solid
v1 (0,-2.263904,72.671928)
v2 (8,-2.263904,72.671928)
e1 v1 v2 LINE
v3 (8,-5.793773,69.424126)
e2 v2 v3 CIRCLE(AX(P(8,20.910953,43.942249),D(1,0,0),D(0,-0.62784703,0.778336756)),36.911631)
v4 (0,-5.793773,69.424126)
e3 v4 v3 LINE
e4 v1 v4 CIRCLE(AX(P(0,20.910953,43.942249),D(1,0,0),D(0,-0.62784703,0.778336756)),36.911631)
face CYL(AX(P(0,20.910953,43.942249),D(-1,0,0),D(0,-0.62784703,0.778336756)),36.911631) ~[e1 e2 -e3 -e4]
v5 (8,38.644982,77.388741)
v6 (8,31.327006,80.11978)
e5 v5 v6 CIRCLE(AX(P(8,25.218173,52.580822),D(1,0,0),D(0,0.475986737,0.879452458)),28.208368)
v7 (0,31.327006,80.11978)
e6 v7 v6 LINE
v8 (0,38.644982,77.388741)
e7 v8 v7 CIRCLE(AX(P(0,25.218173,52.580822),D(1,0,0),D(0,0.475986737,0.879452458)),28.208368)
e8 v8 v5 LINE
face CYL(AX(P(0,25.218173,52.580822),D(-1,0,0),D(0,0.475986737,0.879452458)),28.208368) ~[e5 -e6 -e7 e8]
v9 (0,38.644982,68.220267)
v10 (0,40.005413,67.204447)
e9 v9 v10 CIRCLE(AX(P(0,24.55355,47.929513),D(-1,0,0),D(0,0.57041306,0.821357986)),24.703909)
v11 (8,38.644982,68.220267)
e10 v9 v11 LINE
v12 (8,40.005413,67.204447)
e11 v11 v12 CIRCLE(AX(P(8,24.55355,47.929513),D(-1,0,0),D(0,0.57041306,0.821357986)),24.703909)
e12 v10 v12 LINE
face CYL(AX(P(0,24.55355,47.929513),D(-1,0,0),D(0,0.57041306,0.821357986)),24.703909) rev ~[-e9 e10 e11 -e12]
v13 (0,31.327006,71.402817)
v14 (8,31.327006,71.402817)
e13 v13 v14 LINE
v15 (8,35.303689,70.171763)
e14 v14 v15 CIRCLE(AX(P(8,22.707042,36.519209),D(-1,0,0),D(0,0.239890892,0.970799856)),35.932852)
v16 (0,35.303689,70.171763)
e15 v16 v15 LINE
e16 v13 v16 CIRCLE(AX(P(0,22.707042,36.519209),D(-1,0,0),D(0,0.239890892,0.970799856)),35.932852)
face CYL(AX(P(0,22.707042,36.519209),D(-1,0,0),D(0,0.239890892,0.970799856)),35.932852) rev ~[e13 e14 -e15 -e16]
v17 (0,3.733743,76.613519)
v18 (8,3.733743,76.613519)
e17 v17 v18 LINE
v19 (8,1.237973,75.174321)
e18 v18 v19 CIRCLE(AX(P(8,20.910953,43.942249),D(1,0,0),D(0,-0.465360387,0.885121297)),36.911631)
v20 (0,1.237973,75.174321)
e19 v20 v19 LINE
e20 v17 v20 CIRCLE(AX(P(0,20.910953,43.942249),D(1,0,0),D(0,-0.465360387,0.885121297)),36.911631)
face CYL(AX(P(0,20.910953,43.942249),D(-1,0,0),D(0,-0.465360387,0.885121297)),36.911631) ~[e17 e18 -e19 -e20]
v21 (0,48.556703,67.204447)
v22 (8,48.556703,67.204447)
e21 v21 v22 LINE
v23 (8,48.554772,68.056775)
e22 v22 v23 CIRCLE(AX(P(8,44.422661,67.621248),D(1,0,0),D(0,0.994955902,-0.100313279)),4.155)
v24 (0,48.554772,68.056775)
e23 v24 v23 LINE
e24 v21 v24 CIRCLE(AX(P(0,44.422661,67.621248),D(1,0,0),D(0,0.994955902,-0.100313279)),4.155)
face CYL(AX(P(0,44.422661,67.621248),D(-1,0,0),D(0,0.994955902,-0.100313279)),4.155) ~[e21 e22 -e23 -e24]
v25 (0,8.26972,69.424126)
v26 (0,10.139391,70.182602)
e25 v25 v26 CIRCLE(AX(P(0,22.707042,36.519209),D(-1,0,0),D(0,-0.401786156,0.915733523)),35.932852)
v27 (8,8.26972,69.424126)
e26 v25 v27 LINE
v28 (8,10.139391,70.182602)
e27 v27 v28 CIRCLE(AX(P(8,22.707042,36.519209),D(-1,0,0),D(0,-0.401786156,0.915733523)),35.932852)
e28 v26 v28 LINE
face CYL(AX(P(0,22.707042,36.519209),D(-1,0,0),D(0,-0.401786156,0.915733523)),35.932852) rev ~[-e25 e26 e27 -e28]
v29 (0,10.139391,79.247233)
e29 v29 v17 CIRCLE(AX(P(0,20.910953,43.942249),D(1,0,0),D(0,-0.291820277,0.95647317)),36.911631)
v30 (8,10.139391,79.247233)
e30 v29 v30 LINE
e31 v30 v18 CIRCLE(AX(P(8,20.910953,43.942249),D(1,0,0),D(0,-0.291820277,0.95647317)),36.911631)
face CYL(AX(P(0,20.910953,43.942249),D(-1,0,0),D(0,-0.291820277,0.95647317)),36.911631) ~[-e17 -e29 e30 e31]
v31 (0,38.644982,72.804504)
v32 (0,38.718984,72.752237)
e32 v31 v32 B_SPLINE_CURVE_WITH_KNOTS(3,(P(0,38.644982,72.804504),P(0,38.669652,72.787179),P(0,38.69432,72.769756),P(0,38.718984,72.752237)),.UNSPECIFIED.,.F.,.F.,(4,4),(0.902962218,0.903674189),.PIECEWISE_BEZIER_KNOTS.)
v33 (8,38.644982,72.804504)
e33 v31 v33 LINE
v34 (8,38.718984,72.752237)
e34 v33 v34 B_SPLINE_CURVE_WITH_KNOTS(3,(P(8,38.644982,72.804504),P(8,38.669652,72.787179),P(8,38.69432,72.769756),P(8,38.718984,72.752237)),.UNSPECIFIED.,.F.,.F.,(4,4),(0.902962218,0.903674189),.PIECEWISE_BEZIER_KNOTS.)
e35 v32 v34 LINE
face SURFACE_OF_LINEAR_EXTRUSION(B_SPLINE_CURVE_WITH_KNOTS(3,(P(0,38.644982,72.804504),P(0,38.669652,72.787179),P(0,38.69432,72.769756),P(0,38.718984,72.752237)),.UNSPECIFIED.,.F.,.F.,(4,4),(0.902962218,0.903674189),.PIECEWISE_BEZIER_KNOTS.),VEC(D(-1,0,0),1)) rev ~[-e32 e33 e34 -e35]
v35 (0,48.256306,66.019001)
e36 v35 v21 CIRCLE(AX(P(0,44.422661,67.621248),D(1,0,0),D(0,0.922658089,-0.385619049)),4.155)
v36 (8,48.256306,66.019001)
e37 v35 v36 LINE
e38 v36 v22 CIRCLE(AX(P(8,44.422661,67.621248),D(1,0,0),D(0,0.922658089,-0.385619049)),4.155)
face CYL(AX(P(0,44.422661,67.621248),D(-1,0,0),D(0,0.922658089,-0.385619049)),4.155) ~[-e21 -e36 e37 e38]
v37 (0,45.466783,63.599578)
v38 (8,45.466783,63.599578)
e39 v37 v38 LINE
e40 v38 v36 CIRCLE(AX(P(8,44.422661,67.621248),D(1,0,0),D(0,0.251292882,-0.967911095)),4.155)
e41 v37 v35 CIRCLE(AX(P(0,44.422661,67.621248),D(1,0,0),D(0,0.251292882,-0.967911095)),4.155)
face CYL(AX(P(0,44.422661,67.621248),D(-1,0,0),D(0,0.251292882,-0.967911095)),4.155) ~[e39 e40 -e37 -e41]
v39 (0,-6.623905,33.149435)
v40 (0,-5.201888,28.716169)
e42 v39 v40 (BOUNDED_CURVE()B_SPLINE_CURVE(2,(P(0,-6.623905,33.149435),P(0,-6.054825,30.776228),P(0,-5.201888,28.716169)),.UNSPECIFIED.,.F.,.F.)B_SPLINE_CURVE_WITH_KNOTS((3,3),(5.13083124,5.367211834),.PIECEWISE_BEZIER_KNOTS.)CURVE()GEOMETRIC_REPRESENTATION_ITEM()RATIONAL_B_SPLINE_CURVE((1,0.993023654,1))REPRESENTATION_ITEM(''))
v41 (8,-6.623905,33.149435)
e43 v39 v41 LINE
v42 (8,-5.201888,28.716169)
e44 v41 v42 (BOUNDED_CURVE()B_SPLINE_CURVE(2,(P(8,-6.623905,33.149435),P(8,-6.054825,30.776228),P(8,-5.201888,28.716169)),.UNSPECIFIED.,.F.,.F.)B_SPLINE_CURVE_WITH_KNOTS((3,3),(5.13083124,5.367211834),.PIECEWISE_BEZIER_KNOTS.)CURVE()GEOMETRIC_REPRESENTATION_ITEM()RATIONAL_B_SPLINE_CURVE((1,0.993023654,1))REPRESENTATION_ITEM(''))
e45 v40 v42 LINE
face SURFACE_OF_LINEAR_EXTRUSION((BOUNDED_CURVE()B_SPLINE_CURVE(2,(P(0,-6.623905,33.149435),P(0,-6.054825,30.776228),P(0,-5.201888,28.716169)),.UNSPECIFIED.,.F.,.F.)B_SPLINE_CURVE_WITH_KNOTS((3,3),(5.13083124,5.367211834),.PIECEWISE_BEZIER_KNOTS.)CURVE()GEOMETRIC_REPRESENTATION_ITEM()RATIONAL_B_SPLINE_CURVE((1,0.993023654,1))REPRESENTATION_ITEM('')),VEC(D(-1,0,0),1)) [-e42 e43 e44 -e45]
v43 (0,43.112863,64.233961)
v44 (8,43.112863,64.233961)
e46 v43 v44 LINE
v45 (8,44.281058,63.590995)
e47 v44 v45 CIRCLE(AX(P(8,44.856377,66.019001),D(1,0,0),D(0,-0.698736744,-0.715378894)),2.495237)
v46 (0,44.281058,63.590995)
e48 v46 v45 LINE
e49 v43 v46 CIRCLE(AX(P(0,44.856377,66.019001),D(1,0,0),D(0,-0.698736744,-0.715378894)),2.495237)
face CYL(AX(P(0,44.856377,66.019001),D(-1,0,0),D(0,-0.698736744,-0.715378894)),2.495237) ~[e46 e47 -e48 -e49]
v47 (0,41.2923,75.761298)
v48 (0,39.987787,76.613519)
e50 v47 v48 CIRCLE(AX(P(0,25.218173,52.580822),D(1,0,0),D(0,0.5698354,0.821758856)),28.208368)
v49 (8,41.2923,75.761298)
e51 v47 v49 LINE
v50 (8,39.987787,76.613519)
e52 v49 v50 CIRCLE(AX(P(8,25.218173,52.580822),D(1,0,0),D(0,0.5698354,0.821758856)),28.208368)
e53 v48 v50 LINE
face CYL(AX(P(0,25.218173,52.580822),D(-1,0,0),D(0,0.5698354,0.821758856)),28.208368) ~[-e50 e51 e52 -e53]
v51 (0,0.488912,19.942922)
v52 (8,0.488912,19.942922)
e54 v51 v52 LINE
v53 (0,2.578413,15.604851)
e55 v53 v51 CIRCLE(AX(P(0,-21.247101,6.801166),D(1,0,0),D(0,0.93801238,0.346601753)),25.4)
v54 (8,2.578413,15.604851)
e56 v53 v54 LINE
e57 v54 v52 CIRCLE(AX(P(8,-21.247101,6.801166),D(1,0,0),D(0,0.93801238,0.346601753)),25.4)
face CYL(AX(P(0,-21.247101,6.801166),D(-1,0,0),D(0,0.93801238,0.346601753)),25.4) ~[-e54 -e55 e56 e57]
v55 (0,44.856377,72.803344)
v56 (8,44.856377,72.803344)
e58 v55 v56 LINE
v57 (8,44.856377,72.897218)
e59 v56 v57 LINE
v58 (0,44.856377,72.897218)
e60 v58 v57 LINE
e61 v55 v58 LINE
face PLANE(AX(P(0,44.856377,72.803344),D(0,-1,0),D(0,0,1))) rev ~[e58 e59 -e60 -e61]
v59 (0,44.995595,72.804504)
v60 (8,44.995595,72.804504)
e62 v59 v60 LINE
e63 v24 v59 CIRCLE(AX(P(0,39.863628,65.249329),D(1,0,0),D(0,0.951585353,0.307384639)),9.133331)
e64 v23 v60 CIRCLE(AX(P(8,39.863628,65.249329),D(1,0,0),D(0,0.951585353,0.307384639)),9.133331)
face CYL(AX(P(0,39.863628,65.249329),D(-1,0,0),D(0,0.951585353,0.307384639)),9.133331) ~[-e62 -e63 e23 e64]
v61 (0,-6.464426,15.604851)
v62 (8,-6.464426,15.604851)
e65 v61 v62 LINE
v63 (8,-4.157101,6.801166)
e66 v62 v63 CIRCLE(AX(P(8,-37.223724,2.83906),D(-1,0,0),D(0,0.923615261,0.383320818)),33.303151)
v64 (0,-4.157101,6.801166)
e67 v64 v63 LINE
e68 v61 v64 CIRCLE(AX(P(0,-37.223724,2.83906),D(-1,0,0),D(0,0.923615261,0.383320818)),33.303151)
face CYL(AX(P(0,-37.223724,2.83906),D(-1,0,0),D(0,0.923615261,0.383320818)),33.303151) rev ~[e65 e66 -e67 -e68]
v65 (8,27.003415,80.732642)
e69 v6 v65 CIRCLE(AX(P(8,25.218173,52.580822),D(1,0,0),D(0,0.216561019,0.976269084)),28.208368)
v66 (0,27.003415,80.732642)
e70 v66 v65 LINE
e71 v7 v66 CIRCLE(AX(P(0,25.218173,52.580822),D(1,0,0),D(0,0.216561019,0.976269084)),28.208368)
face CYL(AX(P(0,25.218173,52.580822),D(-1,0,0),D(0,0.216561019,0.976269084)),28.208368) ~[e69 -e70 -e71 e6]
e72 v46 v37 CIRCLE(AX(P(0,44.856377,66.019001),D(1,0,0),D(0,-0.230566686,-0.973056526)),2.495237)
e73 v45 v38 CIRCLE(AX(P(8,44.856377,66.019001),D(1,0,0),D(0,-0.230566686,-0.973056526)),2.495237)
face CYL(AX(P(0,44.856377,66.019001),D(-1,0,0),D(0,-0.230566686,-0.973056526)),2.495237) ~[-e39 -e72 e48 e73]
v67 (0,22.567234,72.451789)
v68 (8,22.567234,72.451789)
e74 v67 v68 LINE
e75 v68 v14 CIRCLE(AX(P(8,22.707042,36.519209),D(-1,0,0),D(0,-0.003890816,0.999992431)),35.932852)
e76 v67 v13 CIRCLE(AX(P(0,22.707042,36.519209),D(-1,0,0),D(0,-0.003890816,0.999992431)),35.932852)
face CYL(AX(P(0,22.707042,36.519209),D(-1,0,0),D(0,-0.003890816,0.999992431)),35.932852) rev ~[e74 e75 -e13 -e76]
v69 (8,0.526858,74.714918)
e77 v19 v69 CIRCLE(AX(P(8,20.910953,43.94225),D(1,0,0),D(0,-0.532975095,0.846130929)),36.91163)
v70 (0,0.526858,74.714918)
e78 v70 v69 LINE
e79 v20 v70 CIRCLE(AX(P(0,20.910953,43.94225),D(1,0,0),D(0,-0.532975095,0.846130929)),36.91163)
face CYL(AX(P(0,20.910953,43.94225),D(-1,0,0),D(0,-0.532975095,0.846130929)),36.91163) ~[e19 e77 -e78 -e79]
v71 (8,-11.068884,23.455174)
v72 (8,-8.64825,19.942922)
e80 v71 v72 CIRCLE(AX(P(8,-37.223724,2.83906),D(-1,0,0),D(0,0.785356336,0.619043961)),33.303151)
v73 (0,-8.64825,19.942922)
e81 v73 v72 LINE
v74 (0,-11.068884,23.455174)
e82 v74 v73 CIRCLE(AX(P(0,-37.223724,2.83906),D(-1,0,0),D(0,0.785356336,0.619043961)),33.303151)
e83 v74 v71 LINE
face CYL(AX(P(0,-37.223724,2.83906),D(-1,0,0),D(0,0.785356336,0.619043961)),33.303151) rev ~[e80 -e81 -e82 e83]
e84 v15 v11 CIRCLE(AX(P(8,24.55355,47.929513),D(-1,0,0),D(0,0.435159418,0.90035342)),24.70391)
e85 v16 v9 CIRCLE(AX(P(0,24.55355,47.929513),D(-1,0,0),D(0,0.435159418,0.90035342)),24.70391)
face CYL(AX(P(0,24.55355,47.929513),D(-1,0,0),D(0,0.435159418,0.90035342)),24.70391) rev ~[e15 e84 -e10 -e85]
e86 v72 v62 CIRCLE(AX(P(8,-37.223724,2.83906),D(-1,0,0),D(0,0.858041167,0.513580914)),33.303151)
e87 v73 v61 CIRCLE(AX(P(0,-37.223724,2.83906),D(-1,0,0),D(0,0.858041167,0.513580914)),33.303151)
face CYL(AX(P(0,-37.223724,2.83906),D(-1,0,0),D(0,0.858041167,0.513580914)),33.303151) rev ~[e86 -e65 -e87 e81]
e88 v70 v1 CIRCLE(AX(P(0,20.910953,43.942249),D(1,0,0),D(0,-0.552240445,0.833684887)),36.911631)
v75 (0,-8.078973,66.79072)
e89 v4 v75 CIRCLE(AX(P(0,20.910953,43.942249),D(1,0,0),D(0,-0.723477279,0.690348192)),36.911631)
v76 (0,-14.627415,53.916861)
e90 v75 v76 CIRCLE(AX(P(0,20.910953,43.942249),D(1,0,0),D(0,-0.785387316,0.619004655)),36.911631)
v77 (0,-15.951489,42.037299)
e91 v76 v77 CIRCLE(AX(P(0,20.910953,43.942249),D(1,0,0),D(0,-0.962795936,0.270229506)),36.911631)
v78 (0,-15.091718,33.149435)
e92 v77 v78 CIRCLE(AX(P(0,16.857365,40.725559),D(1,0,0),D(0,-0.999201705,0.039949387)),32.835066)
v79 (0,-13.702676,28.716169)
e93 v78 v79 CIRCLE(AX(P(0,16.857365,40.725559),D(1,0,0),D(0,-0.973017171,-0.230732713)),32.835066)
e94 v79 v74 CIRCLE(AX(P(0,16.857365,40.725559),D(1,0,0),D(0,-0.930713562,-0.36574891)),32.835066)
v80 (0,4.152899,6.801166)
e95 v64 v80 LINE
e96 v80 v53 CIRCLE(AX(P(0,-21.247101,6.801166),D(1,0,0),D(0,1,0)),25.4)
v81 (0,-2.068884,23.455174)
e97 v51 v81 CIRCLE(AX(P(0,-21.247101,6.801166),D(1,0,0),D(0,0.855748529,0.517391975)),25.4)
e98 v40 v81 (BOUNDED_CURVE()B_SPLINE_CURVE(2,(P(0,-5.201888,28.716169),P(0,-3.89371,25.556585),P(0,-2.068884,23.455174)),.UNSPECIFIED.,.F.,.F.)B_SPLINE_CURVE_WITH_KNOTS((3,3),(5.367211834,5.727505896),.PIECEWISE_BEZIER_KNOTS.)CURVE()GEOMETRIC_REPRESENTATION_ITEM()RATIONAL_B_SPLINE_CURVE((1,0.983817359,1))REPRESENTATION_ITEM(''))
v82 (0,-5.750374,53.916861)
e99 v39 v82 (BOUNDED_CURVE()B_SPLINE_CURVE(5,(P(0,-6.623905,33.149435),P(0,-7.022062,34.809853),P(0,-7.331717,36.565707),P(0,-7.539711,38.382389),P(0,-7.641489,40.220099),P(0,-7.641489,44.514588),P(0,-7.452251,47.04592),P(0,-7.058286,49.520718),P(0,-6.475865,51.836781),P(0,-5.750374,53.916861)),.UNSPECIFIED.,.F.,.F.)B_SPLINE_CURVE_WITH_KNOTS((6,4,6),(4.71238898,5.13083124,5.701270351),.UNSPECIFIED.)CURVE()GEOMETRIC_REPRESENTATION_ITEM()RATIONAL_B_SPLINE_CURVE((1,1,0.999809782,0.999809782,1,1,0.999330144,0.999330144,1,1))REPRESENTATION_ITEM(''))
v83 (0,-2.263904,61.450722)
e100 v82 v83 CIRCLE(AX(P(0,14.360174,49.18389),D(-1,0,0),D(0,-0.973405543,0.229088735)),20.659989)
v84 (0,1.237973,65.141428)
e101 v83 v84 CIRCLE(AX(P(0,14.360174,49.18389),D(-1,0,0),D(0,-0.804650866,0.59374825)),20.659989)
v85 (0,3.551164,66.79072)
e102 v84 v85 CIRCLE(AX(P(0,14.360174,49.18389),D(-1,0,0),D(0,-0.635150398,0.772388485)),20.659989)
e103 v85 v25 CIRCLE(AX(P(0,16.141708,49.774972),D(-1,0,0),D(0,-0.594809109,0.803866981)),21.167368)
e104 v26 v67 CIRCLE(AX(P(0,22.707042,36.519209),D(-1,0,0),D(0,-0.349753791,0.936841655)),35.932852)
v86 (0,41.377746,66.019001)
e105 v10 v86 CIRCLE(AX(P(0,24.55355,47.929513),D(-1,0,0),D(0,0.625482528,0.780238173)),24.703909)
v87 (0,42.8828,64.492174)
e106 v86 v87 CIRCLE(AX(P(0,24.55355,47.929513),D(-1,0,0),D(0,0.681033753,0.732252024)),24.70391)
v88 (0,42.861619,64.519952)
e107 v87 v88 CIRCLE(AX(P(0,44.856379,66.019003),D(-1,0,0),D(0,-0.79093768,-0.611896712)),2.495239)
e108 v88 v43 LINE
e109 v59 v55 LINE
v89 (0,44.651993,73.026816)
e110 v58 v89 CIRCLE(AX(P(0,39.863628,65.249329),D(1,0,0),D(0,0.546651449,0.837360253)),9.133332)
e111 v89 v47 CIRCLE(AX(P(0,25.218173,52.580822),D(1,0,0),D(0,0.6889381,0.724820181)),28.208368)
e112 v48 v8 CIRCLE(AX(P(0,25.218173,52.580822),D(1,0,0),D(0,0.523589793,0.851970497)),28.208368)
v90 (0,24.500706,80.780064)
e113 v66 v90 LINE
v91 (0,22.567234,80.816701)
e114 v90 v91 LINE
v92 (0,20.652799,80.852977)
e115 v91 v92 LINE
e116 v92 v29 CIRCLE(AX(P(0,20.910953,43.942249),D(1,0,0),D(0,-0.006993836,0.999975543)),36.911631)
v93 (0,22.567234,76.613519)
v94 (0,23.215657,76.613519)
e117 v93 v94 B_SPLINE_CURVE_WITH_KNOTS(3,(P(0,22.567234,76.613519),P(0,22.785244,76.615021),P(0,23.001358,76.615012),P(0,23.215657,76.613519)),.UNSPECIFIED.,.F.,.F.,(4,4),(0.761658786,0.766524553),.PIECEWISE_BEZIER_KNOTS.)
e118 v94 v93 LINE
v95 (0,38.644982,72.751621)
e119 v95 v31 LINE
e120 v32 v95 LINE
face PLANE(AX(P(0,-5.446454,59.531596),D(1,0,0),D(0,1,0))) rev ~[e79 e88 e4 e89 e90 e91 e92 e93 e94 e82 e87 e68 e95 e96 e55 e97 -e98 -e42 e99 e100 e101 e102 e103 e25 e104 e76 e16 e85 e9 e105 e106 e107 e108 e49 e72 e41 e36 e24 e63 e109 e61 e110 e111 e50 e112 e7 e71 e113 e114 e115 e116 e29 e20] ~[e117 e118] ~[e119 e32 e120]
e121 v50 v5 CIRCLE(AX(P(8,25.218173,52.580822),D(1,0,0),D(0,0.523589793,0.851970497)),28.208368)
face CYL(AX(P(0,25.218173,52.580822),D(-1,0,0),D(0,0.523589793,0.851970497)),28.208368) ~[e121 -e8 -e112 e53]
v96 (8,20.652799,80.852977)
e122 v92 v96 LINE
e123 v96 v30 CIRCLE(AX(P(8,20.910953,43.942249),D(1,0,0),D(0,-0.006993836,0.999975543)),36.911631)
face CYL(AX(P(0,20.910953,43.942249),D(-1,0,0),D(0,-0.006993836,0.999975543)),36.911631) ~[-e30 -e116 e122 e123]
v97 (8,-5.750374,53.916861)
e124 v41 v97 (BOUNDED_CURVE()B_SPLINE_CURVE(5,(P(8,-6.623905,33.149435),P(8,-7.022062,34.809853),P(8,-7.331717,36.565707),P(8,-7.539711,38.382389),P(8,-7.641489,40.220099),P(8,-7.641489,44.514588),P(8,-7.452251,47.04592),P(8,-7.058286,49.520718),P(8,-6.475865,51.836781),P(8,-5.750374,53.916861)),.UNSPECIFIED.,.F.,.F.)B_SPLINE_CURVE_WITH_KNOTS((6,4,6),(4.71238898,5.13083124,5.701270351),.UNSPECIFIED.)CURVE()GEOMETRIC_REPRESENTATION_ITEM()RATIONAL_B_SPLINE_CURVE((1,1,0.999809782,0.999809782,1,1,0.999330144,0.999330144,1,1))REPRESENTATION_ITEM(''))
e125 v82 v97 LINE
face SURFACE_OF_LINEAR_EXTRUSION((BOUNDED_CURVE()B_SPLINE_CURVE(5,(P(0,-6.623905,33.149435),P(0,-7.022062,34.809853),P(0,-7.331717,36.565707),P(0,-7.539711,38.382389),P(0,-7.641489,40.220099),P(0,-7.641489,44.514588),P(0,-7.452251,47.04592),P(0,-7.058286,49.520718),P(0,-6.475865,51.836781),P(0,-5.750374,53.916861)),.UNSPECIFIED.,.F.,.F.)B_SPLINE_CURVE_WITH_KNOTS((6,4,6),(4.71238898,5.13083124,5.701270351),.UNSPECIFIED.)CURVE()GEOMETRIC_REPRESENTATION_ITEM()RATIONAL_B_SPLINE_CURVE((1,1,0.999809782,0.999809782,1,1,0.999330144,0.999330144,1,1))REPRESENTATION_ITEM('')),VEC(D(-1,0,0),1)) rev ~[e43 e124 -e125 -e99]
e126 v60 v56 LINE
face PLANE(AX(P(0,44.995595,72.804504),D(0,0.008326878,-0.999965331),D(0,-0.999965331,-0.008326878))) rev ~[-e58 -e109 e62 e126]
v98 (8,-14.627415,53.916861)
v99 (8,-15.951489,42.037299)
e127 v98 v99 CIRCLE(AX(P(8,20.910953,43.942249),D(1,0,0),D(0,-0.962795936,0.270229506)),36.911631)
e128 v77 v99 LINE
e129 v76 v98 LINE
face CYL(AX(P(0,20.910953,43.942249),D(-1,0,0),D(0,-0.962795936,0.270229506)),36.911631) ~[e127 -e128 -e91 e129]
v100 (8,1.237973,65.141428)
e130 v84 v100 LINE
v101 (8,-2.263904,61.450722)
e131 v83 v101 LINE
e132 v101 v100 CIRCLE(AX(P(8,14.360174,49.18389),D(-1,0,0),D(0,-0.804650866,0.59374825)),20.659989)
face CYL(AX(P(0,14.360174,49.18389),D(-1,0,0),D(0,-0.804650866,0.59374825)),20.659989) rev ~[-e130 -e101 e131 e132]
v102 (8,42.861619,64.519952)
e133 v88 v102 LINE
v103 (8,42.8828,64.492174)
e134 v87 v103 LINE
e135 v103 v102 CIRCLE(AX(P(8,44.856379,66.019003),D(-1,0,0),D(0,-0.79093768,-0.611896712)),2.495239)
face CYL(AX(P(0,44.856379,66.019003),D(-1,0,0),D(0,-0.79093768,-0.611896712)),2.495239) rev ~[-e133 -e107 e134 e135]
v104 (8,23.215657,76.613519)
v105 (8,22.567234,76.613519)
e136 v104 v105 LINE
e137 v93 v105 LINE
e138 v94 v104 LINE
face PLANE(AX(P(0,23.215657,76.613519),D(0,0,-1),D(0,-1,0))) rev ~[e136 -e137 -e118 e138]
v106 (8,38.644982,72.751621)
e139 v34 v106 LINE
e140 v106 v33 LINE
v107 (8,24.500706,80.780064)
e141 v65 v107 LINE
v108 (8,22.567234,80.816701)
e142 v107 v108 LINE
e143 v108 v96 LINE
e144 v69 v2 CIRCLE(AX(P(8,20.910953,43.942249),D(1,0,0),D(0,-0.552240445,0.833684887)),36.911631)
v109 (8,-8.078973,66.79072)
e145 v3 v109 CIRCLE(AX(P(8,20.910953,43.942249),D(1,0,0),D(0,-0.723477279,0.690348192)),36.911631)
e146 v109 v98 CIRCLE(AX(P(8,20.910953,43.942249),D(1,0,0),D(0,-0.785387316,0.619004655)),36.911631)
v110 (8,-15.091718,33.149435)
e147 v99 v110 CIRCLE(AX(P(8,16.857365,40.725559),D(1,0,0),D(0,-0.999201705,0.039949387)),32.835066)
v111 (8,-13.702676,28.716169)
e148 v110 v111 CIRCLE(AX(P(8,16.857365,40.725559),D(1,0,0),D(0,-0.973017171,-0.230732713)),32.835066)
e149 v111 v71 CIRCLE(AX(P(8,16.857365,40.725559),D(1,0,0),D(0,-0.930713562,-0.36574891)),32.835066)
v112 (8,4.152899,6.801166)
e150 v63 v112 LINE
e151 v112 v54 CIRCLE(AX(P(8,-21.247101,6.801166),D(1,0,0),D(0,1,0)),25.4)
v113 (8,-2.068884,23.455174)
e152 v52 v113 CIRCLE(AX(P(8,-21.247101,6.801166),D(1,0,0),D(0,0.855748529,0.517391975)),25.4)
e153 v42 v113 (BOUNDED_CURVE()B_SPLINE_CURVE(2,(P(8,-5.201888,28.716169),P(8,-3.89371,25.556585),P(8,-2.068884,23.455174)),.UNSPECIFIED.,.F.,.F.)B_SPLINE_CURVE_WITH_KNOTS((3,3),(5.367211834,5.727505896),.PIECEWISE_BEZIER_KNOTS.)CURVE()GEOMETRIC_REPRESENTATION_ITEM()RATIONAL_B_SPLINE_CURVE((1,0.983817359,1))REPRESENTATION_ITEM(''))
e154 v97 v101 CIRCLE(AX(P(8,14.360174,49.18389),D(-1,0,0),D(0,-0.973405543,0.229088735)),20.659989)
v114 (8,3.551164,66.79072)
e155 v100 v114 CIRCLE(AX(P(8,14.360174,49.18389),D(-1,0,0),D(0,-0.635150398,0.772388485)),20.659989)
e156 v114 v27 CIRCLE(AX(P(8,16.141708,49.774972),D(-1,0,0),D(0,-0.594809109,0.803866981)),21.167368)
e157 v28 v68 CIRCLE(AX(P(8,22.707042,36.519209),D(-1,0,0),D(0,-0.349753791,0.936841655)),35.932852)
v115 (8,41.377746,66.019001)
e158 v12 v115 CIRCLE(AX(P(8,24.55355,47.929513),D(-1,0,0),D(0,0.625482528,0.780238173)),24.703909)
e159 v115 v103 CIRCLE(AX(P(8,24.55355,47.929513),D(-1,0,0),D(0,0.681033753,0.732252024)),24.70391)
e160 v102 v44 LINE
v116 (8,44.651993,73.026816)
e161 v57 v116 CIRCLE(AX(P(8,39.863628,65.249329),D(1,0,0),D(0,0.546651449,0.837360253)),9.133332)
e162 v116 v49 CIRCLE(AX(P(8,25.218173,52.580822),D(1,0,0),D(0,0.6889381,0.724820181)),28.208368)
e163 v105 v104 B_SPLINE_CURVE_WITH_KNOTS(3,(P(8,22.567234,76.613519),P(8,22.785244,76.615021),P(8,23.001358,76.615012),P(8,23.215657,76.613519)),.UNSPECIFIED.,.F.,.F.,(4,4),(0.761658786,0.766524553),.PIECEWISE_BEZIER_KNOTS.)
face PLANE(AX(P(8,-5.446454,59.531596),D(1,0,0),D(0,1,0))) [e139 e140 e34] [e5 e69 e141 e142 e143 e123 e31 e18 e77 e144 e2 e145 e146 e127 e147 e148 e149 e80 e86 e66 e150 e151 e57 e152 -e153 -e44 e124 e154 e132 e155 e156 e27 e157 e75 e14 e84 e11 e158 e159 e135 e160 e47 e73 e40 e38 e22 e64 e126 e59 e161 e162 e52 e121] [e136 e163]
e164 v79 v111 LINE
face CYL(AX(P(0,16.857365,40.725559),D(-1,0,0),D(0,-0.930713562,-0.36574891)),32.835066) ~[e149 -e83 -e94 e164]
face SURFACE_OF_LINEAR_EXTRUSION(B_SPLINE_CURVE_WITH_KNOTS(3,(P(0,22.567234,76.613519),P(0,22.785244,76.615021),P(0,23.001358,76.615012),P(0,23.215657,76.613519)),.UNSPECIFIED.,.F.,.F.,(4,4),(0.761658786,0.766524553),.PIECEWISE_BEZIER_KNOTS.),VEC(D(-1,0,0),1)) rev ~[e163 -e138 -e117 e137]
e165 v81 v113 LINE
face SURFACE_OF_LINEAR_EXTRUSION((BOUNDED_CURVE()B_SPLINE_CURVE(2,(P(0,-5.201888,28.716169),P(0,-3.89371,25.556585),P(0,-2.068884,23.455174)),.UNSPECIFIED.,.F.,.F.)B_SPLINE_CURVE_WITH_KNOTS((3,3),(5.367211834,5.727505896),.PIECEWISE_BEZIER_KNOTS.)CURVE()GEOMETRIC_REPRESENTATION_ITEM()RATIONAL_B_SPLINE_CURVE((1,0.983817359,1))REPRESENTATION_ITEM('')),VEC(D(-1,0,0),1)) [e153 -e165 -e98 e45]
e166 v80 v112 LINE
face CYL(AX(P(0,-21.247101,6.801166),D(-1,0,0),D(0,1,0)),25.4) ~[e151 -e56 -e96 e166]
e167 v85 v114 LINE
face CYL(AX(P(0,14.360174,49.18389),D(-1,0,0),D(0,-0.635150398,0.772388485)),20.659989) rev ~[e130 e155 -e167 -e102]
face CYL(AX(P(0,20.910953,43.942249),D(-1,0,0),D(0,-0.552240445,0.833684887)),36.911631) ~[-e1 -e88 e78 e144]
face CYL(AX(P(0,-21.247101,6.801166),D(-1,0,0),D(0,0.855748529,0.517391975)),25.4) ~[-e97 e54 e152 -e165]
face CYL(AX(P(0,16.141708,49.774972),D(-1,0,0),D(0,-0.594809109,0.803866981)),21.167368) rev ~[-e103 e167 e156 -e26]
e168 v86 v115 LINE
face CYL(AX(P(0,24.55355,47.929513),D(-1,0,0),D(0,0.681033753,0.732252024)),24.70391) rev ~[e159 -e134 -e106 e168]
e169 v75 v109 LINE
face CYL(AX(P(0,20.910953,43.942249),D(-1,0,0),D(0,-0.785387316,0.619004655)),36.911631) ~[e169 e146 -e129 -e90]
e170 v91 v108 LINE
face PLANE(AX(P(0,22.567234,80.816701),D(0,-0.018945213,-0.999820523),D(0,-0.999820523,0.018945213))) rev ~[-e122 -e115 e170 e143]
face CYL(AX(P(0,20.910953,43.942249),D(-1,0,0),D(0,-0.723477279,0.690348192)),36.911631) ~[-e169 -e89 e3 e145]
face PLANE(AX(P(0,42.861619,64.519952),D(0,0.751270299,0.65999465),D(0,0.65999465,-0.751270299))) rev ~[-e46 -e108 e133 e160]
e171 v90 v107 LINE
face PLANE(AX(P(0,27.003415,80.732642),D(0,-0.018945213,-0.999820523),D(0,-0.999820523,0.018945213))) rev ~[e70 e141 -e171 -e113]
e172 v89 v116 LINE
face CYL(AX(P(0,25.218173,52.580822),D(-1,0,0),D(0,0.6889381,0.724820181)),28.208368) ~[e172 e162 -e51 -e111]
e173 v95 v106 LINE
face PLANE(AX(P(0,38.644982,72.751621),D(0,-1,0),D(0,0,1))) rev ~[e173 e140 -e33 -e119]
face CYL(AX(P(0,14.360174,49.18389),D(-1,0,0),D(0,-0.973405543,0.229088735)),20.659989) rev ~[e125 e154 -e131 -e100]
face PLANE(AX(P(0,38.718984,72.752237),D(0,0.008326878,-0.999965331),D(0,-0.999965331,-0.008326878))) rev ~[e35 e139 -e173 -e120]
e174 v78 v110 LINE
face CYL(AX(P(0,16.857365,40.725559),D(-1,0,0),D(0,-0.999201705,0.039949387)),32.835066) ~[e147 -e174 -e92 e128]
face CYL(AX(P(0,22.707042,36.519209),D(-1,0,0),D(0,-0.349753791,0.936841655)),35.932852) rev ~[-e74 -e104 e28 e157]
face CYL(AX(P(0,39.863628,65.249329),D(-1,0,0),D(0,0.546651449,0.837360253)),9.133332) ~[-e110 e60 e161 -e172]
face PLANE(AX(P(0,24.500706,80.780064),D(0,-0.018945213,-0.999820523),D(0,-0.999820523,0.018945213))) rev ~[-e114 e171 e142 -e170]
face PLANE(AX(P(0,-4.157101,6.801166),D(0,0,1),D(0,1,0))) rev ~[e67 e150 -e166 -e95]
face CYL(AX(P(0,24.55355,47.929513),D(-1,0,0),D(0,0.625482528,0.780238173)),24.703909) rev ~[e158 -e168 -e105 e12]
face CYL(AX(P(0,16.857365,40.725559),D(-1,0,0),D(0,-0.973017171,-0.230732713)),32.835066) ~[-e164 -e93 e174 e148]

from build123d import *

# Parameters (mm, degrees)
F0_W     = 7.3179761397
F0_H     = 0.852221109
F2_DEPTH = 8


with BuildPart() as f2:
    # F0 (on Right) → F2 (new body)
    with BuildSketch(Plane.YZ):
        with BuildLine():
            Line((-10.1888944263, 53.9168607201), (-5.7503742038, 53.9168607201))
            ThreePointArc((-5.7503742038, 53.9168607201), (-4.3894384073, 57.8607093725), (-2.2639043723, 61.4507223949))
            Line((-2.2639043723, 61.4507223949), (-2.2639043723, 66.7907201963))
            add(Edge.make_bspline(
                [(-10.1888944263, 53.9168607201), (-8.3345715025, 58.6916164824), (-4.5405432149, 63.9948893867), (-2.2639043723, 66.7907201963)],
                knots=[0.4485191098, 0.4485191098, 0.4485191098, 0.4485191098, 0.5436368318, 0.5436368318, 0.5436368318, 0.5436368318], degree=3))
        make_face()
        with BuildLine():
            add(Edge.make_bspline(
                [(-5.7503742038, 53.9168607201), (-7.6414888716, 48.4947767316), (-7.6414888716, 42.0372994525)],
                knots=[4.1382491567, 4.1382491567, 4.1382491567, 4.7123889804, 4.7123889804, 4.7123889804], degree=2, weights=[1, 0.9590776261, 1]))
            Line((-5.7503742038, 53.9168607201), (-10.1888944263, 53.9168607201))
            add(Edge.make_bspline(
                [(-11.7964888716, 42.0372994525), (-11.953273607, 45.832214532), (-11.8401507048, 49.6649877966), (-10.1888944263, 53.9168607201)],
                knots=[0.3638177163, 0.3638177163, 0.3638177163, 0.3638177163, 0.4485191098, 0.4485191098, 0.4485191098, 0.4485191098], degree=3))
            Line((-11.7964888716, 42.0372994525), (-7.6414888716, 42.0372994525))
        make_face()
        with BuildLine():
            add(Edge.make_bspline(
                [(-7.6414888716, 42.0372994525), (-7.6414888716, 37.3930199427), (-6.6239046752, 33.1494348573)],
                knots=[4.7123889804, 4.7123889804, 4.7123889804, 5.1308312404, 5.1308312404, 5.1308312404], degree=2, weights=[1, 0.9781929812, 1]))
            Line((-7.6414888716, 42.0372994525), (-11.7964888716, 42.0372994525))
            add(Edge.make_bspline(
                [(-10.8578113303, 33.1494348573), (-11.3245159446, 35.5121547718), (-11.6611145328, 38.7606149052), (-11.7964888716, 42.0372994525)],
                knots=[0.2906830765, 0.2906830765, 0.2906830765, 0.2906830765, 0.3638177163, 0.3638177163, 0.3638177163, 0.3638177163], degree=3))
            Line((-10.8578113303, 33.1494348573), (-6.6239046752, 33.1494348573))
        make_face()
        with BuildLine():
            Line((-2.2639043723, 66.7907201963), (-2.2639043723, 61.4507223949))
            ThreePointArc((-2.2639043723, 61.4507223949), (-0.6270073096, 63.4042822038), (1.237973472, 65.1414277376))
            Line((1.237973472, 65.1414277376), (1.237973472, 66.7907201963))
            Line((1.237973472, 66.7907201963), (-2.2639043723, 66.7907201963))
        make_face()
        with BuildLine():
            add(Edge.make_bspline(
                [(-11.7964888716, 42.0372994525), (-11.953273607, 45.832214532), (-11.8401507048, 49.6649877966), (-10.1888944263, 53.9168607201)],
                knots=[0.3638177163, 0.3638177163, 0.3638177163, 0.3638177163, 0.4485191098, 0.4485191098, 0.4485191098, 0.4485191098], degree=3))
            Line((-10.1888944263, 53.9168607201), (-14.6274146488, 53.9168607201))
            ThreePointArc((-14.6274146488, 53.9168607201), (-15.7735164452, 48.0310330528), (-15.9514888716, 42.0372994525))
            Line((-15.9514888716, 42.0372994525), (-11.7964888716, 42.0372994525))
        make_face()
        with BuildLine():
            Line((-14.6274146488, 53.9168607201), (-10.1888944263, 53.9168607201))
            add(Edge.make_bspline(
                [(-10.1888944263, 53.9168607201), (-8.3345715025, 58.6916164824), (-4.5405432149, 63.9948893867), (-2.2639043723, 66.7907201963)],
                knots=[0.4485191098, 0.4485191098, 0.4485191098, 0.4485191098, 0.5436368318, 0.5436368318, 0.5436368318, 0.5436368318], degree=3))
            Line((-2.2639043723, 66.7907201963), (-8.0789732143, 66.7907201963))
            ThreePointArc((-8.0789732143, 66.7907201963), (-11.9890354693, 60.6772188038), (-14.6274146488, 53.9168607201))
        make_face()
        with BuildLine():
            add(Edge.make_bspline(
                [(-6.6239046752, 33.1494348573), (-6.0548250045, 30.7762277933), (-5.2018884672, 28.7161691389)],
                knots=[5.1308312404, 5.1308312404, 5.1308312404, 5.3672118342, 5.3672118342, 5.3672118342], degree=2, weights=[1, 0.9930236536, 1]))
            Line((-6.6239046752, 33.1494348573), (-10.8578113303, 33.1494348573))
            add(Edge.make_bspline(
                [(-9.4522823352, 28.7161691389), (-10.1167744763, 30.2015624686), (-10.5211448069, 31.4450405251), (-10.8578113303, 33.1494348573)],
                knots=[0.2379259703, 0.2379259703, 0.2379259703, 0.2379259703, 0.2906830765, 0.2906830765, 0.2906830765, 0.2906830765], degree=3))
            Line((-9.4522823352, 28.7161691389), (-5.2018884672, 28.7161691389))
        make_face()
        with BuildLine():
            add(Edge.make_bspline(
                [(-10.8578113303, 33.1494348573), (-11.3245159446, 35.5121547718), (-11.6611145328, 38.7606149052), (-11.7964888716, 42.0372994525)],
                knots=[0.2906830765, 0.2906830765, 0.2906830765, 0.2906830765, 0.3638177163, 0.3638177163, 0.3638177163, 0.3638177163], degree=3))
            Line((-11.7964888716, 42.0372994525), (-15.9514888716, 42.0372994525))
            ThreePointArc((-15.9514888716, 42.0372994525), (-15.825139965, 37.5640044352), (-15.0917179854, 33.1494348573))
            Line((-15.0917179854, 33.1494348573), (-10.8578113303, 33.1494348573))
        make_face()
        with BuildLine():
            Line((1.237973472, 66.7907201963), (1.237973472, 65.1414277376))
            ThreePointArc((1.237973472, 65.1414277376), (2.366186126, 66.0058819106), (3.5511644697, 66.7907201963))
            Line((3.5511644697, 66.7907201963), (1.237973472, 66.7907201963))
        make_face()
        with BuildLine():
            add(Edge.make_bspline(
                [(-2.2639043723, 66.7907201963), (-1.2992613055, 67.9753520122), (-0.6070401721, 68.7098144761), (0.2691752969, 69.4241264728)],
                knots=[0.5436368318, 0.5436368318, 0.5436368318, 0.5436368318, 0.5839395136, 0.5839395136, 0.5839395136, 0.5839395136], degree=3))
            Line((-2.2639043723, 66.7907201963), (1.237973472, 66.7907201963))
            Line((1.237973472, 66.7907201963), (1.237973472, 69.4241264728))
            Line((1.237973472, 69.4241264728), (0.2691752969, 69.4241264728))
        make_face()
        with BuildLine():
            Line((-8.0789732143, 66.7907201963), (-2.2639043723, 66.7907201963))
            Line((-2.2639043723, 66.7907201963), (-2.2639043723, 69.4241264728))
            Line((-2.2639043723, 69.4241264728), (-5.7937727942, 69.4241264728))
            ThreePointArc((-5.7937727942, 69.4241264728), (-6.9674844154, 68.1344209955), (-8.0789732143, 66.7907201963))
        make_face()
        with BuildLine():
            Line((-2.2639043723, 69.4241264728), (-2.2639043723, 66.7907201963))
            add(Edge.make_bspline(
                [(-2.2639043723, 66.7907201963), (-1.2992613055, 67.9753520122), (-0.6070401721, 68.7098144761), (0.2691752969, 69.4241264728)],
                knots=[0.5436368318, 0.5436368318, 0.5436368318, 0.5436368318, 0.5839395136, 0.5839395136, 0.5839395136, 0.5839395136], degree=3))
            Line((0.2691752969, 69.4241264728), (-2.2639043723, 69.4241264728))
        make_face()
        with BuildLine():
            add(Edge.make_bspline(
                [(-5.2018884672, 28.7161691389), (-3.8937096158, 25.55658452), (-2.0688837208, 23.4551739871)],
                knots=[5.3672118342, 5.3672118342, 5.3672118342, 5.727505896, 5.727505896, 5.727505896], degree=2, weights=[1, 0.9838173593, 1]))
            Line((-5.2018884672, 28.7161691389), (-9.4522823352, 28.7161691389))
            add(Edge.make_bspline(
                [(-6.5688837208, 23.4551739871), (-7.6073097342, 25.0299710332), (-8.6975714446, 27.0291025005), (-9.4522823352, 28.7161691389)],
                knots=[0.1780059801, 0.1780059801, 0.1780059801, 0.1780059801, 0.2379259703, 0.2379259703, 0.2379259703, 0.2379259703], degree=3))
            Line((-6.5688837208, 23.4551739871), (-2.0688837208, 23.4551739871))
        make_face()
        with BuildLine():
            add(Edge.make_bspline(
                [(-9.4522823352, 28.7161691389), (-10.1167744763, 30.2015624686), (-10.5211448069, 31.4450405251), (-10.8578113303, 33.1494348573)],
                knots=[0.2379259703, 0.2379259703, 0.2379259703, 0.2379259703, 0.2906830765, 0.2906830765, 0.2906830765, 0.2906830765], degree=3))
            Line((-10.8578113303, 33.1494348573), (-15.0917179854, 33.1494348573))
            ThreePointArc((-15.0917179854, 33.1494348573), (-14.475702404, 30.9082045202), (-13.7026762032, 28.7161691389))
            Line((-13.7026762032, 28.7161691389), (-9.4522823352, 28.7161691389))
        make_face()
        with BuildLine():
            Line((1.237973472, 66.7907201963), (3.5511644697, 66.7907201963))
            ThreePointArc((3.5511644697, 66.7907201963), (5.8260641015, 68.2586124131), (8.2697197383, 69.4241264728))
            Line((8.2697197383, 69.4241264728), (1.237973472, 69.4241264728))
            Line((1.237973472, 69.4241264728), (1.237973472, 66.7907201963))
        make_face()
        with BuildLine():
            Line((-2.2639043723, 72.6719278562), (-2.2639043723, 69.4241264728))
            Line((-2.2639043723, 69.4241264728), (0.2691752969, 69.4241264728))
            add(Edge.make_bspline(
                [(0.2691752969, 69.4241264728), (0.5652336546, 69.6654803909), (0.8822977177, 69.9045338318), (1.237973472, 70.1578745178)],
                knots=[0.5839395136, 0.5839395136, 0.5839395136, 0.5839395136, 0.5975571068, 0.5975571068, 0.5975571068, 0.5975571068], degree=3))
            Line((1.237973472, 70.1578745177), (1.237973472, 74.7149176101))
            Line((1.237973472, 74.7149176101), (0.5268579819, 74.7149176101))
            ThreePointArc((0.5268579819, 74.7149176101), (-0.8924649684, 73.7261276448), (-2.2639043723, 72.6719278562))
        make_face()
        with BuildLine():
            Line((-5.7937727942, 69.4241264728), (-2.2639043723, 69.4241264728))
            Line((-2.2639043723, 69.4241264728), (-2.2639043723, 72.6719278562))
            ThreePointArc((-2.2639043723, 72.6719278562), (-4.0816510588, 71.1054263302), (-5.7937727942, 69.4241264728))
        make_face()
        with BuildLine():
            add(Edge.make_bspline(
                [(0.2691752969, 69.4241264728), (0.5652336546, 69.6654803909), (0.8822977177, 69.9045338318), (1.237973472, 70.1578745178)],
                knots=[0.5839395136, 0.5839395136, 0.5839395136, 0.5839395136, 0.5975571068, 0.5975571068, 0.5975571068, 0.5975571068], degree=3))
            Line((0.2691752969, 69.4241264728), (1.237973472, 69.4241264728))
            Line((1.237973472, 69.4241264728), (1.237973472, 70.1578745177))
        make_face()
        with BuildLine():
            ThreePointArc((0.4889115668, 19.9429222314), (-0.7147477725, 21.7538403606), (-2.0688837208, 23.4551739871))
            Line((-2.0688837208, 23.4551739871), (-6.5688837208, 23.4551739871))
            add(Edge.make_bspline(
                [(-4.0796691275, 19.9429222314), (-4.8467986494, 21.0916706181), (-5.6892435404, 22.121179326), (-6.5688837208, 23.4551739871)],
                knots=[0.127248362, 0.127248362, 0.127248362, 0.127248362, 0.1780059801, 0.1780059801, 0.1780059801, 0.1780059801], degree=3))
            Line((-4.0796691275, 19.9429222314), (0.4889115668, 19.9429222314))
        make_face()
        with BuildLine():
            add(Edge.make_bspline(
                [(-6.5688837208, 23.4551739871), (-7.6073097342, 25.0299710332), (-8.6975714446, 27.0291025005), (-9.4522823352, 28.7161691389)],
                knots=[0.1780059801, 0.1780059801, 0.1780059801, 0.1780059801, 0.2379259703, 0.2379259703, 0.2379259703, 0.2379259703], degree=3))
            Line((-9.4522823352, 28.7161691389), (-13.7026762032, 28.7161691389))
            ThreePointArc((-13.7026762032, 28.7161691389), (-12.5038516774, 26.0265617582), (-11.0688837208, 23.4551739871))
            Line((-11.0688837208, 23.4551739871), (-6.5688837208, 23.4551739871))
        make_face()
        with BuildLine():
            Line((1.237973472, 69.4241264728), (8.2697197383, 69.4241264728))
            ThreePointArc((8.2697197383, 69.4241264728), (9.1992306977, 69.8164897066), (10.1393910192, 70.1826018489))
            Line((10.1393910192, 70.1826018489), (10.1393910192, 74.7149176101))
            add(Edge.make_bspline(
                [(1.237973472, 70.1578745178), (3.2585532739, 71.5970928701), (6.5252601055, 73.4974078941), (10.1393910192, 74.7149176101)],
                knots=[0.5975571068, 0.5975571068, 0.5975571068, 0.5975571068, 0.6749181117, 0.6749181117, 0.6749181117, 0.6749181117], degree=3))
            Line((1.237973472, 70.1578745177), (1.237973472, 69.4241264728))
        make_face()
        with BuildLine():
            Line((1.237973472, 74.7149176101), (1.237973472, 70.1578745177))
            add(Edge.make_bspline(
                [(1.237973472, 70.1578745178), (3.2585532739, 71.5970928701), (6.5252601055, 73.4974078941), (10.1393910192, 74.7149176101)],
                knots=[0.5975571068, 0.5975571068, 0.5975571068, 0.5975571068, 0.6749181117, 0.6749181117, 0.6749181117, 0.6749181117], degree=3))
            Line((10.1393910192, 74.7149176101), (1.237973472, 74.7149176101))
        make_face()
        with BuildLine():
            ThreePointArc((2.5784133808, 15.6048506081), (1.6366902241, 17.8235113891), (0.4889115668, 19.9429222314))
            Line((0.4889115668, 19.9429222314), (-4.0796691275, 19.9429222314))
            add(Edge.make_bspline(
                [(-1.9430062522, 15.6048506081), (-2.5381682165, 17.3739492027), (-3.2666174927, 18.7254071612), (-4.0796691275, 19.9429222314)],
                knots=[0.0734522777, 0.0734522777, 0.0734522777, 0.0734522777, 0.127248362, 0.127248362, 0.127248362, 0.127248362], degree=3))
            Line((-1.9430062522, 15.6048506081), (2.5784133808, 15.6048506081))
        make_face()
        with BuildLine():
            add(Edge.make_bspline(
                [(-4.0796691275, 19.9429222314), (-4.8467986494, 21.0916706181), (-5.6892435404, 22.121179326), (-6.5688837208, 23.4551739871)],
                knots=[0.127248362, 0.127248362, 0.127248362, 0.127248362, 0.1780059801, 0.1780059801, 0.1780059801, 0.1780059801], degree=3))
            Line((-6.5688837208, 23.4551739871), (-11.0688837208, 23.4551739871))
            ThreePointArc((-11.0688837208, 23.4551739871), (-9.80227604, 21.7378435208), (-8.6482498217, 19.9429222314))
            Line((-8.6482498217, 19.9429222314), (-4.0796691275, 19.9429222314))
        make_face()
        with BuildLine():
            Line((10.1393910192, 74.7149176101), (10.1393910192, 70.1826018489))
            ThreePointArc((10.1393910192, 70.1826018489), (16.2528045864, 71.8676558179), (22.5672341212, 72.4517893404))
            Line((22.5672341212, 72.4517893404), (22.5672341212, 76.6135193731))
            add(Edge.make_bspline(
                [(10.1393910192, 74.7149176101), (14.1917188378, 76.0800448315), (18.6808252051, 76.5867551297), (22.5672341212, 76.6135193731)],
                knots=[0.6749181117, 0.6749181117, 0.6749181117, 0.6749181117, 0.7616587859, 0.7616587859, 0.7616587859, 0.7616587859], degree=3))
        make_face()
        with BuildLine():
            ThreePointArc((1.237973472, 75.1743212979), (0.8810985763, 74.9466582845), (0.5268579819, 74.7149176101))
            Line((0.5268579819, 74.7149176101), (1.237973472, 74.7149176101))
            Line((1.237973472, 74.7149176101), (1.237973472, 75.1743212979))
        make_face()
        with BuildLine():
            Line((1.237973472, 75.1743212979), (1.237973472, 74.7149176101))
            Line((1.237973472, 74.7149176101), (10.1393910192, 74.7149176101))
            Line((10.1393910192, 74.7149176101), (10.1393910192, 76.6135193731))
            Line((10.1393910192, 76.6135193731), (3.7337425961, 76.6135193731))
            ThreePointArc((3.7337425961, 76.6135193731), (2.4718112827, 75.918279351), (1.237973472, 75.1743212979))
        make_face()
        with BuildLine():
            Line((10.1393910192, 76.6135193731), (10.1393910192, 74.7149176101))
            add(Edge.make_bspline(
                [(10.1393910192, 74.7149176101), (14.1917188378, 76.0800448315), (18.6808252051, 76.5867551297), (22.5672341212, 76.6135193731)],
                knots=[0.6749181117, 0.6749181117, 0.6749181117, 0.6749181117, 0.7616587859, 0.7616587859, 0.7616587859, 0.7616587859], degree=3))
            Line((22.5672341212, 76.6135193731), (10.1393910192, 76.6135193731))
        make_face()
        with BuildLine():
            ThreePointArc((4.152898933, 6.8011660784), (3.7561793875, 11.2728510531), (2.5784133808, 15.6048506081))
            Line((2.5784133808, 15.6048506081), (-1.9430062522, 15.6048506081))
            add(Edge.make_bspline(
                [(-0.002101067, 6.8011660784), (-0.5662415412, 9.9952594602), (-1.1303820154, 13.189352842), (-1.9430062522, 15.6048506081)],
                knots=[0, 0, 0, 0, 0.0734522777, 0.0734522777, 0.0734522777, 0.0734522777], degree=3))
            Line((-0.002101067, 6.8011660784), (4.152898933, 6.8011660784))
        make_face()
        with BuildLine():
            add(Edge.make_bspline(
                [(-1.9430062522, 15.6048506081), (-2.5381682165, 17.3739492027), (-3.2666174927, 18.7254071612), (-4.0796691275, 19.9429222314)],
                knots=[0.0734522777, 0.0734522777, 0.0734522777, 0.0734522777, 0.127248362, 0.127248362, 0.127248362, 0.127248362], degree=3))
            Line((-4.0796691275, 19.9429222314), (-8.6482498217, 19.9429222314))
            ThreePointArc((-8.6482498217, 19.9429222314), (-7.4771524819, 17.8137490419), (-6.4644258852, 15.6048506081))
            Line((-6.4644258852, 15.6048506081), (-1.9430062522, 15.6048506081))
        make_face()
        with BuildLine():
            Line((22.5672341212, 76.6135193731), (22.5672341212, 72.4517893404))
            ThreePointArc((22.5672341212, 72.4517893404), (26.9794357563, 72.1971647924), (31.3270061461, 71.4028168618))
            Line((31.3270061461, 71.4028168618), (31.3270061461, 72.690683065))
            Line((31.3270061461, 72.690683065), (31.3270061461, 75.761298264))
            add(Edge.make_bspline(
                [(23.2156569251, 76.6135193731), (26.1977321335, 76.5927510585), (28.8283393897, 76.2847039305), (31.3270061461, 75.761298264)],
                knots=[0.7665245528, 0.7665245528, 0.7665245528, 0.7665245528, 0.8342341594, 0.8342341594, 0.8342341594, 0.8342341594], degree=3))
            Line((23.2156569251, 76.6135193731), (22.5672341212, 76.6135193731))
        make_face()
        with BuildLine():
            Line((3.7337425961, 76.6135193731), (10.1393910192, 76.6135193731))
            Line((10.1393910192, 76.6135193731), (10.1393910192, 79.2472333713))
            ThreePointArc((10.1393910192, 79.2472333713), (6.8746578417, 78.0809496958), (3.7337425961, 76.6135193731))
        make_face()
        with BuildLine():
            Line((10.1393910192, 79.2472333713), (10.1393910192, 76.6135193731))
            Line((10.1393910192, 76.6135193731), (22.5672341212, 76.6135193731))
            Line((22.5672341212, 76.6135193731), (22.5672341212, 80.816700989))
            Line((22.5672341212, 80.816700989), (20.6527994041, 80.8529768738))
            ThreePointArc((20.6527994041, 80.8529768738), (15.3379592409, 80.4307432513), (10.1393910192, 79.2472333713))
        make_face()
        with BuildLine():
            Line((22.5672341212, 80.816700989), (22.5672341212, 76.6135193731))
            add(Edge.make_bspline(
                [(22.5672341212, 76.6135193731), (22.7852444149, 76.6150207283), (23.0013581932, 76.6150118316), (23.2156569251, 76.6135193731)],
                knots=[0.7616587859, 0.7616587859, 0.7616587859, 0.7616587859, 0.7665245528, 0.7665245528, 0.7665245528, 0.7665245528], degree=3))
            Line((23.2156569251, 76.6135193731), (31.3270061461, 76.6135193731))
            Line((31.3270061461, 76.6135193731), (31.3270061461, 80.1197796662))
            ThreePointArc((31.3270061461, 80.1197796662), (29.1770875592, 80.5100007635), (27.0034147385, 80.7326415141))
            Line((27.0034147385, 80.7326415141), (24.5007061931, 80.7800643727))
            Line((24.5007061931, 80.7800643727), (22.5672341212, 80.816700989))
        make_face()
        with BuildLine():
            add(Edge.make_bspline(
                [(-0.002101067, 6.8011660784), (-0.5662415412, 9.9952594602), (-1.1303820154, 13.189352842), (-1.9430062522, 15.6048506081)],
                knots=[0, 0, 0, 0, 0.0734522777, 0.0734522777, 0.0734522777, 0.0734522777], degree=3))
            Line((-1.9430062522, 15.6048506081), (-6.4644258852, 15.6048506081))
            ThreePointArc((-6.4644258852, 15.6048506081), (-5.008614741, 11.2821973774), (-4.157101067, 6.8011660784))
            Line((-4.157101067, 6.8011660784), (-0.002101067, 6.8011660784))
        make_face()
        with BuildLine():
            Line((31.3270061461, 72.690683065), (31.3270061461, 71.4028168618))
            ThreePointArc((31.3270061461, 71.4028168618), (33.333189747, 70.8449262382), (35.3036885535, 70.1717627798))
            ThreePointArc((35.3036885535, 70.1717627798), (37.0126027179, 69.2615348872), (38.6449822857, 68.2202667256))
            Line((38.6449822857, 68.2202667256), (38.6449822857, 72.7516210723))
            Line((38.6449822857, 72.7516210723), (31.3270061461, 72.690683065))
        make_face()
        with BuildLine():
            Line((31.3270061461, 76.6135193731), (23.2156569251, 76.6135193731))
            add(Edge.make_bspline(
                [(23.2156569251, 76.6135193731), (26.1977321335, 76.5927510585), (28.8283393897, 76.2847039305), (31.3270061461, 75.761298264)],
                knots=[0.7665245528, 0.7665245528, 0.7665245528, 0.7665245528, 0.8342341594, 0.8342341594, 0.8342341594, 0.8342341594], degree=3))
            Line((31.3270061461, 75.761298264), (31.3270061461, 76.6135193731))
        make_face()
        with BuildLine():
            Line((31.3270061461, 75.761298264), (31.3270061461, 72.690683065))
            Line((31.3270061461, 72.690683065), (38.6449822857, 72.7516210723))
            Line((38.6449822857, 72.7516210723), (38.6449822857, 72.804503681))
            add(Edge.make_bspline(
                [(31.3270061461, 75.761298264), (33.8632565179, 75.2300198081), (36.2635673813, 74.4768554728), (38.6449822857, 72.804503681)],
                knots=[0.8342341594, 0.8342341594, 0.8342341594, 0.8342341594, 0.9029622179, 0.9029622179, 0.9029622179, 0.9029622179], degree=3))
        make_face()
        with BuildLine():
            Line((31.3270061461, 80.1197796662), (31.3270061461, 76.6135193731))
            Line((31.3270061461, 76.6135193731), (38.6449822857, 76.6135193731))
            Line((38.6449822857, 76.6135193731), (38.6449822857, 77.3887406365))
            ThreePointArc((38.6449822857, 77.3887406365), (35.0809806575, 79.0087817843), (31.3270061461, 80.1197796662))
        make_face()
        with Locations((34.9859942159, 76.1874088185)):
            Rectangle(F0_W, F0_H)
        with BuildLine():
            Line((38.6449822857, 75.761298264), (31.3270061461, 75.761298264))
            add(Edge.make_bspline(
                [(31.3270061461, 75.761298264), (33.8632565179, 75.2300198081), (36.2635673813, 74.4768554728), (38.6449822857, 72.804503681)],
                knots=[0.8342341594, 0.8342341594, 0.8342341594, 0.8342341594, 0.9029622179, 0.9029622179, 0.9029622179, 0.9029622179], degree=3))
            Line((38.6449822857, 72.804503681), (38.6449822857, 75.761298264))
        make_face()
        with BuildLine():
            Line((38.6449822857, 72.7516210723), (38.6449822857, 68.2202667256))
            ThreePointArc((38.6449822857, 68.2202667256), (39.3339273149, 67.7240475044), (40.0054134636, 67.2044465799))
            Line((40.0054134636, 67.2044465799), (44.2810582439, 67.2044465799))
            add(Edge.make_bspline(
                [(38.7189835451, 72.7522372931), (41.0830829077, 71.0729861649), (43.413637043, 68.5097934745), (44.2810582439, 67.2044465799)],
                knots=[0.9036741885, 0.9036741885, 0.9036741885, 0.9036741885, 0.9719182271, 0.9719182271, 0.9719182271, 0.9719182271], degree=3))
            Line((38.7189835451, 72.7522372931), (38.6449822857, 72.7516210723))
        make_face()
        with BuildLine():
            Line((38.6449822857, 77.3887406365), (38.6449822857, 76.6135193731))
            Line((38.6449822857, 76.6135193731), (39.9877868127, 76.6135193731))
            ThreePointArc((39.9877868127, 76.6135193731), (39.3217119492, 77.010357895), (38.6449822857, 77.3887406365))
        make_face()
        with BuildLine():
            Line((39.9877868127, 76.6135193731), (38.6449822857, 76.6135193731))
            Line((38.6449822857, 76.6135193731), (38.6449822857, 75.761298264))
            Line((38.6449822857, 75.761298264), (41.2922999092, 75.761298264))
            ThreePointArc((41.2922999092, 75.761298264), (40.6459290143, 76.1964181141), (39.9877868127, 76.6135193731))
        make_face()
        with BuildLine():
            Line((41.2922999092, 75.761298264), (38.6449822857, 75.761298264))
            Line((38.6449822857, 75.761298264), (38.6449822857, 72.804503681))
            add(Edge.make_bspline(
                [(38.6449822857, 72.804503681), (38.6696519411, 72.7871793827), (38.6943195687, 72.7697564427), (38.7189835451, 72.7522372931)],
                knots=[0.9029622179, 0.9029622179, 0.9029622179, 0.9029622179, 0.9036741885, 0.9036741885, 0.9036741885, 0.9036741885], degree=3))
            Line((38.7189835451, 72.7522372931), (44.8563766883, 72.803344389))
            Line((44.8563766883, 72.803344389), (44.8563766883, 72.8972181129))
            ThreePointArc((44.8563766883, 72.8972181129), (44.7546139615, 72.9626942681), (44.6519926928, 73.0268164536))
            ThreePointArc((44.6519926928, 73.0268164536), (43.0247143735, 74.4586445772), (41.2922999092, 75.761298264))
        make_face()
        with BuildLine():
            Line((44.2810582439, 67.2044465799), (40.0054134636, 67.2044465799))
            ThreePointArc((40.0054134636, 67.2044465799), (40.7024608637, 66.6243204625), (41.3777458899, 66.0190011059))
            Line((41.3777458899, 66.0190011059), (44.2810582439, 66.0190011059))
            Line((44.2810582439, 66.0190011059), (44.2810582439, 67.2044465799))
        make_face()
        with BuildLine():
            Line((44.8563766883, 72.803344389), (38.7189835451, 72.7522372931))
            add(Edge.make_bspline(
                [(38.7189835451, 72.7522372931), (41.0830829077, 71.0729861649), (43.413637043, 68.5097934745), (44.2810582439, 67.2044465799)],
                knots=[0.9036741885, 0.9036741885, 0.9036741885, 0.9036741885, 0.9719182271, 0.9719182271, 0.9719182271, 0.9719182271], degree=3))
            Line((44.2810582439, 67.2044465799), (44.8563766883, 67.2044465799))
            Line((44.8563766883, 67.2044465799), (44.8563766883, 72.803344389))
        make_face()
        with BuildLine():
            Line((44.2810582439, 66.0190011059), (41.3777458899, 66.0190011059))
            ThreePointArc((41.3777458899, 66.0190011059), (42.1468438935, 65.2719221816), (42.8828000164, 64.4921739894))
            ThreePointArc((42.8828000164, 64.4921739894), (42.8721611441, 64.5060256939), (42.8616194891, 64.5199515271))
            Line((42.8616194891, 64.5199515271), (43.1128631572, 64.2339614732))
            ThreePointArc((43.1128631572, 64.2339614732), (43.653215449, 63.8329981426), (44.2810582439, 63.5909948022))
            Line((44.2810582439, 63.5909948022), (44.2810582439, 66.0190011059))
        make_face()
        with BuildLine():
            add(Edge.make_bspline(
                [(44.2810582439, 67.2044465799), (44.63799382, 66.667308745), (44.7471852541, 66.3431549254), (44.8563766883, 66.0190011059)],
                knots=[0.9719182271, 0.9719182271, 0.9719182271, 0.9719182271, 1, 1, 1, 1], degree=3))
            Line((44.2810582439, 67.2044465799), (44.2810582439, 66.0190011059))
            Line((44.2810582439, 66.0190011059), (44.8563766883, 66.0190011059))
        make_face()
        with BuildLine():
            Line((44.8563766883, 67.2044465799), (44.2810582439, 67.2044465799))
            add(Edge.make_bspline(
                [(44.2810582439, 67.2044465799), (44.63799382, 66.667308745), (44.7471852541, 66.3431549254), (44.8563766883, 66.0190011059)],
                knots=[0.9719182271, 0.9719182271, 0.9719182271, 0.9719182271, 1, 1, 1, 1], degree=3))
            Line((44.8563766883, 66.0190011059), (44.8563766883, 67.2044465799))
        make_face()
        with BuildLine():
            Line((44.995594754, 72.804503681), (44.8563766883, 72.803344389))
            Line((44.8563766883, 72.803344389), (44.8563766883, 67.2044465799))
            Line((44.8563766883, 67.2044465799), (48.5567030241, 67.2044465799))
            ThreePointArc((48.5567030241, 67.2044465799), (48.5776505922, 67.6306605106), (48.5547722523, 68.0567751628))
            ThreePointArc((48.5547722523, 68.0567751628), (47.1714888934, 70.7277333316), (44.995594754, 72.804503681))
        make_face()
        with BuildLine():
            Line((44.8563766883, 66.0190011059), (44.2810582439, 66.0190011059))
            Line((44.2810582439, 66.0190011059), (44.2810582439, 63.5909948022))
            ThreePointArc((44.2810582439, 63.5909948022), (44.8744379473, 63.5238298264), (45.4667831786, 63.5995776539))
            ThreePointArc((45.4667831786, 63.5995776539), (47.1450780919, 64.4823835606), (48.2563056132, 66.0190011059))
            Line((48.2563056132, 66.0190011059), (44.8563766883, 66.0190011059))
        make_face()
        with BuildLine():
            Line((48.5567030241, 67.2044465799), (44.8563766883, 67.2044465799))
            Line((44.8563766883, 67.2044465799), (44.8563766883, 66.0190011059))
            Line((44.8563766883, 66.0190011059), (48.2563056132, 66.0190011059))
            ThreePointArc((48.2563056132, 66.0190011059), (48.4503561043, 66.6006115959), (48.5567030241, 67.2044465799))
        make_face()
    extrude(amount=F2_DEPTH)


solid = f2.part
